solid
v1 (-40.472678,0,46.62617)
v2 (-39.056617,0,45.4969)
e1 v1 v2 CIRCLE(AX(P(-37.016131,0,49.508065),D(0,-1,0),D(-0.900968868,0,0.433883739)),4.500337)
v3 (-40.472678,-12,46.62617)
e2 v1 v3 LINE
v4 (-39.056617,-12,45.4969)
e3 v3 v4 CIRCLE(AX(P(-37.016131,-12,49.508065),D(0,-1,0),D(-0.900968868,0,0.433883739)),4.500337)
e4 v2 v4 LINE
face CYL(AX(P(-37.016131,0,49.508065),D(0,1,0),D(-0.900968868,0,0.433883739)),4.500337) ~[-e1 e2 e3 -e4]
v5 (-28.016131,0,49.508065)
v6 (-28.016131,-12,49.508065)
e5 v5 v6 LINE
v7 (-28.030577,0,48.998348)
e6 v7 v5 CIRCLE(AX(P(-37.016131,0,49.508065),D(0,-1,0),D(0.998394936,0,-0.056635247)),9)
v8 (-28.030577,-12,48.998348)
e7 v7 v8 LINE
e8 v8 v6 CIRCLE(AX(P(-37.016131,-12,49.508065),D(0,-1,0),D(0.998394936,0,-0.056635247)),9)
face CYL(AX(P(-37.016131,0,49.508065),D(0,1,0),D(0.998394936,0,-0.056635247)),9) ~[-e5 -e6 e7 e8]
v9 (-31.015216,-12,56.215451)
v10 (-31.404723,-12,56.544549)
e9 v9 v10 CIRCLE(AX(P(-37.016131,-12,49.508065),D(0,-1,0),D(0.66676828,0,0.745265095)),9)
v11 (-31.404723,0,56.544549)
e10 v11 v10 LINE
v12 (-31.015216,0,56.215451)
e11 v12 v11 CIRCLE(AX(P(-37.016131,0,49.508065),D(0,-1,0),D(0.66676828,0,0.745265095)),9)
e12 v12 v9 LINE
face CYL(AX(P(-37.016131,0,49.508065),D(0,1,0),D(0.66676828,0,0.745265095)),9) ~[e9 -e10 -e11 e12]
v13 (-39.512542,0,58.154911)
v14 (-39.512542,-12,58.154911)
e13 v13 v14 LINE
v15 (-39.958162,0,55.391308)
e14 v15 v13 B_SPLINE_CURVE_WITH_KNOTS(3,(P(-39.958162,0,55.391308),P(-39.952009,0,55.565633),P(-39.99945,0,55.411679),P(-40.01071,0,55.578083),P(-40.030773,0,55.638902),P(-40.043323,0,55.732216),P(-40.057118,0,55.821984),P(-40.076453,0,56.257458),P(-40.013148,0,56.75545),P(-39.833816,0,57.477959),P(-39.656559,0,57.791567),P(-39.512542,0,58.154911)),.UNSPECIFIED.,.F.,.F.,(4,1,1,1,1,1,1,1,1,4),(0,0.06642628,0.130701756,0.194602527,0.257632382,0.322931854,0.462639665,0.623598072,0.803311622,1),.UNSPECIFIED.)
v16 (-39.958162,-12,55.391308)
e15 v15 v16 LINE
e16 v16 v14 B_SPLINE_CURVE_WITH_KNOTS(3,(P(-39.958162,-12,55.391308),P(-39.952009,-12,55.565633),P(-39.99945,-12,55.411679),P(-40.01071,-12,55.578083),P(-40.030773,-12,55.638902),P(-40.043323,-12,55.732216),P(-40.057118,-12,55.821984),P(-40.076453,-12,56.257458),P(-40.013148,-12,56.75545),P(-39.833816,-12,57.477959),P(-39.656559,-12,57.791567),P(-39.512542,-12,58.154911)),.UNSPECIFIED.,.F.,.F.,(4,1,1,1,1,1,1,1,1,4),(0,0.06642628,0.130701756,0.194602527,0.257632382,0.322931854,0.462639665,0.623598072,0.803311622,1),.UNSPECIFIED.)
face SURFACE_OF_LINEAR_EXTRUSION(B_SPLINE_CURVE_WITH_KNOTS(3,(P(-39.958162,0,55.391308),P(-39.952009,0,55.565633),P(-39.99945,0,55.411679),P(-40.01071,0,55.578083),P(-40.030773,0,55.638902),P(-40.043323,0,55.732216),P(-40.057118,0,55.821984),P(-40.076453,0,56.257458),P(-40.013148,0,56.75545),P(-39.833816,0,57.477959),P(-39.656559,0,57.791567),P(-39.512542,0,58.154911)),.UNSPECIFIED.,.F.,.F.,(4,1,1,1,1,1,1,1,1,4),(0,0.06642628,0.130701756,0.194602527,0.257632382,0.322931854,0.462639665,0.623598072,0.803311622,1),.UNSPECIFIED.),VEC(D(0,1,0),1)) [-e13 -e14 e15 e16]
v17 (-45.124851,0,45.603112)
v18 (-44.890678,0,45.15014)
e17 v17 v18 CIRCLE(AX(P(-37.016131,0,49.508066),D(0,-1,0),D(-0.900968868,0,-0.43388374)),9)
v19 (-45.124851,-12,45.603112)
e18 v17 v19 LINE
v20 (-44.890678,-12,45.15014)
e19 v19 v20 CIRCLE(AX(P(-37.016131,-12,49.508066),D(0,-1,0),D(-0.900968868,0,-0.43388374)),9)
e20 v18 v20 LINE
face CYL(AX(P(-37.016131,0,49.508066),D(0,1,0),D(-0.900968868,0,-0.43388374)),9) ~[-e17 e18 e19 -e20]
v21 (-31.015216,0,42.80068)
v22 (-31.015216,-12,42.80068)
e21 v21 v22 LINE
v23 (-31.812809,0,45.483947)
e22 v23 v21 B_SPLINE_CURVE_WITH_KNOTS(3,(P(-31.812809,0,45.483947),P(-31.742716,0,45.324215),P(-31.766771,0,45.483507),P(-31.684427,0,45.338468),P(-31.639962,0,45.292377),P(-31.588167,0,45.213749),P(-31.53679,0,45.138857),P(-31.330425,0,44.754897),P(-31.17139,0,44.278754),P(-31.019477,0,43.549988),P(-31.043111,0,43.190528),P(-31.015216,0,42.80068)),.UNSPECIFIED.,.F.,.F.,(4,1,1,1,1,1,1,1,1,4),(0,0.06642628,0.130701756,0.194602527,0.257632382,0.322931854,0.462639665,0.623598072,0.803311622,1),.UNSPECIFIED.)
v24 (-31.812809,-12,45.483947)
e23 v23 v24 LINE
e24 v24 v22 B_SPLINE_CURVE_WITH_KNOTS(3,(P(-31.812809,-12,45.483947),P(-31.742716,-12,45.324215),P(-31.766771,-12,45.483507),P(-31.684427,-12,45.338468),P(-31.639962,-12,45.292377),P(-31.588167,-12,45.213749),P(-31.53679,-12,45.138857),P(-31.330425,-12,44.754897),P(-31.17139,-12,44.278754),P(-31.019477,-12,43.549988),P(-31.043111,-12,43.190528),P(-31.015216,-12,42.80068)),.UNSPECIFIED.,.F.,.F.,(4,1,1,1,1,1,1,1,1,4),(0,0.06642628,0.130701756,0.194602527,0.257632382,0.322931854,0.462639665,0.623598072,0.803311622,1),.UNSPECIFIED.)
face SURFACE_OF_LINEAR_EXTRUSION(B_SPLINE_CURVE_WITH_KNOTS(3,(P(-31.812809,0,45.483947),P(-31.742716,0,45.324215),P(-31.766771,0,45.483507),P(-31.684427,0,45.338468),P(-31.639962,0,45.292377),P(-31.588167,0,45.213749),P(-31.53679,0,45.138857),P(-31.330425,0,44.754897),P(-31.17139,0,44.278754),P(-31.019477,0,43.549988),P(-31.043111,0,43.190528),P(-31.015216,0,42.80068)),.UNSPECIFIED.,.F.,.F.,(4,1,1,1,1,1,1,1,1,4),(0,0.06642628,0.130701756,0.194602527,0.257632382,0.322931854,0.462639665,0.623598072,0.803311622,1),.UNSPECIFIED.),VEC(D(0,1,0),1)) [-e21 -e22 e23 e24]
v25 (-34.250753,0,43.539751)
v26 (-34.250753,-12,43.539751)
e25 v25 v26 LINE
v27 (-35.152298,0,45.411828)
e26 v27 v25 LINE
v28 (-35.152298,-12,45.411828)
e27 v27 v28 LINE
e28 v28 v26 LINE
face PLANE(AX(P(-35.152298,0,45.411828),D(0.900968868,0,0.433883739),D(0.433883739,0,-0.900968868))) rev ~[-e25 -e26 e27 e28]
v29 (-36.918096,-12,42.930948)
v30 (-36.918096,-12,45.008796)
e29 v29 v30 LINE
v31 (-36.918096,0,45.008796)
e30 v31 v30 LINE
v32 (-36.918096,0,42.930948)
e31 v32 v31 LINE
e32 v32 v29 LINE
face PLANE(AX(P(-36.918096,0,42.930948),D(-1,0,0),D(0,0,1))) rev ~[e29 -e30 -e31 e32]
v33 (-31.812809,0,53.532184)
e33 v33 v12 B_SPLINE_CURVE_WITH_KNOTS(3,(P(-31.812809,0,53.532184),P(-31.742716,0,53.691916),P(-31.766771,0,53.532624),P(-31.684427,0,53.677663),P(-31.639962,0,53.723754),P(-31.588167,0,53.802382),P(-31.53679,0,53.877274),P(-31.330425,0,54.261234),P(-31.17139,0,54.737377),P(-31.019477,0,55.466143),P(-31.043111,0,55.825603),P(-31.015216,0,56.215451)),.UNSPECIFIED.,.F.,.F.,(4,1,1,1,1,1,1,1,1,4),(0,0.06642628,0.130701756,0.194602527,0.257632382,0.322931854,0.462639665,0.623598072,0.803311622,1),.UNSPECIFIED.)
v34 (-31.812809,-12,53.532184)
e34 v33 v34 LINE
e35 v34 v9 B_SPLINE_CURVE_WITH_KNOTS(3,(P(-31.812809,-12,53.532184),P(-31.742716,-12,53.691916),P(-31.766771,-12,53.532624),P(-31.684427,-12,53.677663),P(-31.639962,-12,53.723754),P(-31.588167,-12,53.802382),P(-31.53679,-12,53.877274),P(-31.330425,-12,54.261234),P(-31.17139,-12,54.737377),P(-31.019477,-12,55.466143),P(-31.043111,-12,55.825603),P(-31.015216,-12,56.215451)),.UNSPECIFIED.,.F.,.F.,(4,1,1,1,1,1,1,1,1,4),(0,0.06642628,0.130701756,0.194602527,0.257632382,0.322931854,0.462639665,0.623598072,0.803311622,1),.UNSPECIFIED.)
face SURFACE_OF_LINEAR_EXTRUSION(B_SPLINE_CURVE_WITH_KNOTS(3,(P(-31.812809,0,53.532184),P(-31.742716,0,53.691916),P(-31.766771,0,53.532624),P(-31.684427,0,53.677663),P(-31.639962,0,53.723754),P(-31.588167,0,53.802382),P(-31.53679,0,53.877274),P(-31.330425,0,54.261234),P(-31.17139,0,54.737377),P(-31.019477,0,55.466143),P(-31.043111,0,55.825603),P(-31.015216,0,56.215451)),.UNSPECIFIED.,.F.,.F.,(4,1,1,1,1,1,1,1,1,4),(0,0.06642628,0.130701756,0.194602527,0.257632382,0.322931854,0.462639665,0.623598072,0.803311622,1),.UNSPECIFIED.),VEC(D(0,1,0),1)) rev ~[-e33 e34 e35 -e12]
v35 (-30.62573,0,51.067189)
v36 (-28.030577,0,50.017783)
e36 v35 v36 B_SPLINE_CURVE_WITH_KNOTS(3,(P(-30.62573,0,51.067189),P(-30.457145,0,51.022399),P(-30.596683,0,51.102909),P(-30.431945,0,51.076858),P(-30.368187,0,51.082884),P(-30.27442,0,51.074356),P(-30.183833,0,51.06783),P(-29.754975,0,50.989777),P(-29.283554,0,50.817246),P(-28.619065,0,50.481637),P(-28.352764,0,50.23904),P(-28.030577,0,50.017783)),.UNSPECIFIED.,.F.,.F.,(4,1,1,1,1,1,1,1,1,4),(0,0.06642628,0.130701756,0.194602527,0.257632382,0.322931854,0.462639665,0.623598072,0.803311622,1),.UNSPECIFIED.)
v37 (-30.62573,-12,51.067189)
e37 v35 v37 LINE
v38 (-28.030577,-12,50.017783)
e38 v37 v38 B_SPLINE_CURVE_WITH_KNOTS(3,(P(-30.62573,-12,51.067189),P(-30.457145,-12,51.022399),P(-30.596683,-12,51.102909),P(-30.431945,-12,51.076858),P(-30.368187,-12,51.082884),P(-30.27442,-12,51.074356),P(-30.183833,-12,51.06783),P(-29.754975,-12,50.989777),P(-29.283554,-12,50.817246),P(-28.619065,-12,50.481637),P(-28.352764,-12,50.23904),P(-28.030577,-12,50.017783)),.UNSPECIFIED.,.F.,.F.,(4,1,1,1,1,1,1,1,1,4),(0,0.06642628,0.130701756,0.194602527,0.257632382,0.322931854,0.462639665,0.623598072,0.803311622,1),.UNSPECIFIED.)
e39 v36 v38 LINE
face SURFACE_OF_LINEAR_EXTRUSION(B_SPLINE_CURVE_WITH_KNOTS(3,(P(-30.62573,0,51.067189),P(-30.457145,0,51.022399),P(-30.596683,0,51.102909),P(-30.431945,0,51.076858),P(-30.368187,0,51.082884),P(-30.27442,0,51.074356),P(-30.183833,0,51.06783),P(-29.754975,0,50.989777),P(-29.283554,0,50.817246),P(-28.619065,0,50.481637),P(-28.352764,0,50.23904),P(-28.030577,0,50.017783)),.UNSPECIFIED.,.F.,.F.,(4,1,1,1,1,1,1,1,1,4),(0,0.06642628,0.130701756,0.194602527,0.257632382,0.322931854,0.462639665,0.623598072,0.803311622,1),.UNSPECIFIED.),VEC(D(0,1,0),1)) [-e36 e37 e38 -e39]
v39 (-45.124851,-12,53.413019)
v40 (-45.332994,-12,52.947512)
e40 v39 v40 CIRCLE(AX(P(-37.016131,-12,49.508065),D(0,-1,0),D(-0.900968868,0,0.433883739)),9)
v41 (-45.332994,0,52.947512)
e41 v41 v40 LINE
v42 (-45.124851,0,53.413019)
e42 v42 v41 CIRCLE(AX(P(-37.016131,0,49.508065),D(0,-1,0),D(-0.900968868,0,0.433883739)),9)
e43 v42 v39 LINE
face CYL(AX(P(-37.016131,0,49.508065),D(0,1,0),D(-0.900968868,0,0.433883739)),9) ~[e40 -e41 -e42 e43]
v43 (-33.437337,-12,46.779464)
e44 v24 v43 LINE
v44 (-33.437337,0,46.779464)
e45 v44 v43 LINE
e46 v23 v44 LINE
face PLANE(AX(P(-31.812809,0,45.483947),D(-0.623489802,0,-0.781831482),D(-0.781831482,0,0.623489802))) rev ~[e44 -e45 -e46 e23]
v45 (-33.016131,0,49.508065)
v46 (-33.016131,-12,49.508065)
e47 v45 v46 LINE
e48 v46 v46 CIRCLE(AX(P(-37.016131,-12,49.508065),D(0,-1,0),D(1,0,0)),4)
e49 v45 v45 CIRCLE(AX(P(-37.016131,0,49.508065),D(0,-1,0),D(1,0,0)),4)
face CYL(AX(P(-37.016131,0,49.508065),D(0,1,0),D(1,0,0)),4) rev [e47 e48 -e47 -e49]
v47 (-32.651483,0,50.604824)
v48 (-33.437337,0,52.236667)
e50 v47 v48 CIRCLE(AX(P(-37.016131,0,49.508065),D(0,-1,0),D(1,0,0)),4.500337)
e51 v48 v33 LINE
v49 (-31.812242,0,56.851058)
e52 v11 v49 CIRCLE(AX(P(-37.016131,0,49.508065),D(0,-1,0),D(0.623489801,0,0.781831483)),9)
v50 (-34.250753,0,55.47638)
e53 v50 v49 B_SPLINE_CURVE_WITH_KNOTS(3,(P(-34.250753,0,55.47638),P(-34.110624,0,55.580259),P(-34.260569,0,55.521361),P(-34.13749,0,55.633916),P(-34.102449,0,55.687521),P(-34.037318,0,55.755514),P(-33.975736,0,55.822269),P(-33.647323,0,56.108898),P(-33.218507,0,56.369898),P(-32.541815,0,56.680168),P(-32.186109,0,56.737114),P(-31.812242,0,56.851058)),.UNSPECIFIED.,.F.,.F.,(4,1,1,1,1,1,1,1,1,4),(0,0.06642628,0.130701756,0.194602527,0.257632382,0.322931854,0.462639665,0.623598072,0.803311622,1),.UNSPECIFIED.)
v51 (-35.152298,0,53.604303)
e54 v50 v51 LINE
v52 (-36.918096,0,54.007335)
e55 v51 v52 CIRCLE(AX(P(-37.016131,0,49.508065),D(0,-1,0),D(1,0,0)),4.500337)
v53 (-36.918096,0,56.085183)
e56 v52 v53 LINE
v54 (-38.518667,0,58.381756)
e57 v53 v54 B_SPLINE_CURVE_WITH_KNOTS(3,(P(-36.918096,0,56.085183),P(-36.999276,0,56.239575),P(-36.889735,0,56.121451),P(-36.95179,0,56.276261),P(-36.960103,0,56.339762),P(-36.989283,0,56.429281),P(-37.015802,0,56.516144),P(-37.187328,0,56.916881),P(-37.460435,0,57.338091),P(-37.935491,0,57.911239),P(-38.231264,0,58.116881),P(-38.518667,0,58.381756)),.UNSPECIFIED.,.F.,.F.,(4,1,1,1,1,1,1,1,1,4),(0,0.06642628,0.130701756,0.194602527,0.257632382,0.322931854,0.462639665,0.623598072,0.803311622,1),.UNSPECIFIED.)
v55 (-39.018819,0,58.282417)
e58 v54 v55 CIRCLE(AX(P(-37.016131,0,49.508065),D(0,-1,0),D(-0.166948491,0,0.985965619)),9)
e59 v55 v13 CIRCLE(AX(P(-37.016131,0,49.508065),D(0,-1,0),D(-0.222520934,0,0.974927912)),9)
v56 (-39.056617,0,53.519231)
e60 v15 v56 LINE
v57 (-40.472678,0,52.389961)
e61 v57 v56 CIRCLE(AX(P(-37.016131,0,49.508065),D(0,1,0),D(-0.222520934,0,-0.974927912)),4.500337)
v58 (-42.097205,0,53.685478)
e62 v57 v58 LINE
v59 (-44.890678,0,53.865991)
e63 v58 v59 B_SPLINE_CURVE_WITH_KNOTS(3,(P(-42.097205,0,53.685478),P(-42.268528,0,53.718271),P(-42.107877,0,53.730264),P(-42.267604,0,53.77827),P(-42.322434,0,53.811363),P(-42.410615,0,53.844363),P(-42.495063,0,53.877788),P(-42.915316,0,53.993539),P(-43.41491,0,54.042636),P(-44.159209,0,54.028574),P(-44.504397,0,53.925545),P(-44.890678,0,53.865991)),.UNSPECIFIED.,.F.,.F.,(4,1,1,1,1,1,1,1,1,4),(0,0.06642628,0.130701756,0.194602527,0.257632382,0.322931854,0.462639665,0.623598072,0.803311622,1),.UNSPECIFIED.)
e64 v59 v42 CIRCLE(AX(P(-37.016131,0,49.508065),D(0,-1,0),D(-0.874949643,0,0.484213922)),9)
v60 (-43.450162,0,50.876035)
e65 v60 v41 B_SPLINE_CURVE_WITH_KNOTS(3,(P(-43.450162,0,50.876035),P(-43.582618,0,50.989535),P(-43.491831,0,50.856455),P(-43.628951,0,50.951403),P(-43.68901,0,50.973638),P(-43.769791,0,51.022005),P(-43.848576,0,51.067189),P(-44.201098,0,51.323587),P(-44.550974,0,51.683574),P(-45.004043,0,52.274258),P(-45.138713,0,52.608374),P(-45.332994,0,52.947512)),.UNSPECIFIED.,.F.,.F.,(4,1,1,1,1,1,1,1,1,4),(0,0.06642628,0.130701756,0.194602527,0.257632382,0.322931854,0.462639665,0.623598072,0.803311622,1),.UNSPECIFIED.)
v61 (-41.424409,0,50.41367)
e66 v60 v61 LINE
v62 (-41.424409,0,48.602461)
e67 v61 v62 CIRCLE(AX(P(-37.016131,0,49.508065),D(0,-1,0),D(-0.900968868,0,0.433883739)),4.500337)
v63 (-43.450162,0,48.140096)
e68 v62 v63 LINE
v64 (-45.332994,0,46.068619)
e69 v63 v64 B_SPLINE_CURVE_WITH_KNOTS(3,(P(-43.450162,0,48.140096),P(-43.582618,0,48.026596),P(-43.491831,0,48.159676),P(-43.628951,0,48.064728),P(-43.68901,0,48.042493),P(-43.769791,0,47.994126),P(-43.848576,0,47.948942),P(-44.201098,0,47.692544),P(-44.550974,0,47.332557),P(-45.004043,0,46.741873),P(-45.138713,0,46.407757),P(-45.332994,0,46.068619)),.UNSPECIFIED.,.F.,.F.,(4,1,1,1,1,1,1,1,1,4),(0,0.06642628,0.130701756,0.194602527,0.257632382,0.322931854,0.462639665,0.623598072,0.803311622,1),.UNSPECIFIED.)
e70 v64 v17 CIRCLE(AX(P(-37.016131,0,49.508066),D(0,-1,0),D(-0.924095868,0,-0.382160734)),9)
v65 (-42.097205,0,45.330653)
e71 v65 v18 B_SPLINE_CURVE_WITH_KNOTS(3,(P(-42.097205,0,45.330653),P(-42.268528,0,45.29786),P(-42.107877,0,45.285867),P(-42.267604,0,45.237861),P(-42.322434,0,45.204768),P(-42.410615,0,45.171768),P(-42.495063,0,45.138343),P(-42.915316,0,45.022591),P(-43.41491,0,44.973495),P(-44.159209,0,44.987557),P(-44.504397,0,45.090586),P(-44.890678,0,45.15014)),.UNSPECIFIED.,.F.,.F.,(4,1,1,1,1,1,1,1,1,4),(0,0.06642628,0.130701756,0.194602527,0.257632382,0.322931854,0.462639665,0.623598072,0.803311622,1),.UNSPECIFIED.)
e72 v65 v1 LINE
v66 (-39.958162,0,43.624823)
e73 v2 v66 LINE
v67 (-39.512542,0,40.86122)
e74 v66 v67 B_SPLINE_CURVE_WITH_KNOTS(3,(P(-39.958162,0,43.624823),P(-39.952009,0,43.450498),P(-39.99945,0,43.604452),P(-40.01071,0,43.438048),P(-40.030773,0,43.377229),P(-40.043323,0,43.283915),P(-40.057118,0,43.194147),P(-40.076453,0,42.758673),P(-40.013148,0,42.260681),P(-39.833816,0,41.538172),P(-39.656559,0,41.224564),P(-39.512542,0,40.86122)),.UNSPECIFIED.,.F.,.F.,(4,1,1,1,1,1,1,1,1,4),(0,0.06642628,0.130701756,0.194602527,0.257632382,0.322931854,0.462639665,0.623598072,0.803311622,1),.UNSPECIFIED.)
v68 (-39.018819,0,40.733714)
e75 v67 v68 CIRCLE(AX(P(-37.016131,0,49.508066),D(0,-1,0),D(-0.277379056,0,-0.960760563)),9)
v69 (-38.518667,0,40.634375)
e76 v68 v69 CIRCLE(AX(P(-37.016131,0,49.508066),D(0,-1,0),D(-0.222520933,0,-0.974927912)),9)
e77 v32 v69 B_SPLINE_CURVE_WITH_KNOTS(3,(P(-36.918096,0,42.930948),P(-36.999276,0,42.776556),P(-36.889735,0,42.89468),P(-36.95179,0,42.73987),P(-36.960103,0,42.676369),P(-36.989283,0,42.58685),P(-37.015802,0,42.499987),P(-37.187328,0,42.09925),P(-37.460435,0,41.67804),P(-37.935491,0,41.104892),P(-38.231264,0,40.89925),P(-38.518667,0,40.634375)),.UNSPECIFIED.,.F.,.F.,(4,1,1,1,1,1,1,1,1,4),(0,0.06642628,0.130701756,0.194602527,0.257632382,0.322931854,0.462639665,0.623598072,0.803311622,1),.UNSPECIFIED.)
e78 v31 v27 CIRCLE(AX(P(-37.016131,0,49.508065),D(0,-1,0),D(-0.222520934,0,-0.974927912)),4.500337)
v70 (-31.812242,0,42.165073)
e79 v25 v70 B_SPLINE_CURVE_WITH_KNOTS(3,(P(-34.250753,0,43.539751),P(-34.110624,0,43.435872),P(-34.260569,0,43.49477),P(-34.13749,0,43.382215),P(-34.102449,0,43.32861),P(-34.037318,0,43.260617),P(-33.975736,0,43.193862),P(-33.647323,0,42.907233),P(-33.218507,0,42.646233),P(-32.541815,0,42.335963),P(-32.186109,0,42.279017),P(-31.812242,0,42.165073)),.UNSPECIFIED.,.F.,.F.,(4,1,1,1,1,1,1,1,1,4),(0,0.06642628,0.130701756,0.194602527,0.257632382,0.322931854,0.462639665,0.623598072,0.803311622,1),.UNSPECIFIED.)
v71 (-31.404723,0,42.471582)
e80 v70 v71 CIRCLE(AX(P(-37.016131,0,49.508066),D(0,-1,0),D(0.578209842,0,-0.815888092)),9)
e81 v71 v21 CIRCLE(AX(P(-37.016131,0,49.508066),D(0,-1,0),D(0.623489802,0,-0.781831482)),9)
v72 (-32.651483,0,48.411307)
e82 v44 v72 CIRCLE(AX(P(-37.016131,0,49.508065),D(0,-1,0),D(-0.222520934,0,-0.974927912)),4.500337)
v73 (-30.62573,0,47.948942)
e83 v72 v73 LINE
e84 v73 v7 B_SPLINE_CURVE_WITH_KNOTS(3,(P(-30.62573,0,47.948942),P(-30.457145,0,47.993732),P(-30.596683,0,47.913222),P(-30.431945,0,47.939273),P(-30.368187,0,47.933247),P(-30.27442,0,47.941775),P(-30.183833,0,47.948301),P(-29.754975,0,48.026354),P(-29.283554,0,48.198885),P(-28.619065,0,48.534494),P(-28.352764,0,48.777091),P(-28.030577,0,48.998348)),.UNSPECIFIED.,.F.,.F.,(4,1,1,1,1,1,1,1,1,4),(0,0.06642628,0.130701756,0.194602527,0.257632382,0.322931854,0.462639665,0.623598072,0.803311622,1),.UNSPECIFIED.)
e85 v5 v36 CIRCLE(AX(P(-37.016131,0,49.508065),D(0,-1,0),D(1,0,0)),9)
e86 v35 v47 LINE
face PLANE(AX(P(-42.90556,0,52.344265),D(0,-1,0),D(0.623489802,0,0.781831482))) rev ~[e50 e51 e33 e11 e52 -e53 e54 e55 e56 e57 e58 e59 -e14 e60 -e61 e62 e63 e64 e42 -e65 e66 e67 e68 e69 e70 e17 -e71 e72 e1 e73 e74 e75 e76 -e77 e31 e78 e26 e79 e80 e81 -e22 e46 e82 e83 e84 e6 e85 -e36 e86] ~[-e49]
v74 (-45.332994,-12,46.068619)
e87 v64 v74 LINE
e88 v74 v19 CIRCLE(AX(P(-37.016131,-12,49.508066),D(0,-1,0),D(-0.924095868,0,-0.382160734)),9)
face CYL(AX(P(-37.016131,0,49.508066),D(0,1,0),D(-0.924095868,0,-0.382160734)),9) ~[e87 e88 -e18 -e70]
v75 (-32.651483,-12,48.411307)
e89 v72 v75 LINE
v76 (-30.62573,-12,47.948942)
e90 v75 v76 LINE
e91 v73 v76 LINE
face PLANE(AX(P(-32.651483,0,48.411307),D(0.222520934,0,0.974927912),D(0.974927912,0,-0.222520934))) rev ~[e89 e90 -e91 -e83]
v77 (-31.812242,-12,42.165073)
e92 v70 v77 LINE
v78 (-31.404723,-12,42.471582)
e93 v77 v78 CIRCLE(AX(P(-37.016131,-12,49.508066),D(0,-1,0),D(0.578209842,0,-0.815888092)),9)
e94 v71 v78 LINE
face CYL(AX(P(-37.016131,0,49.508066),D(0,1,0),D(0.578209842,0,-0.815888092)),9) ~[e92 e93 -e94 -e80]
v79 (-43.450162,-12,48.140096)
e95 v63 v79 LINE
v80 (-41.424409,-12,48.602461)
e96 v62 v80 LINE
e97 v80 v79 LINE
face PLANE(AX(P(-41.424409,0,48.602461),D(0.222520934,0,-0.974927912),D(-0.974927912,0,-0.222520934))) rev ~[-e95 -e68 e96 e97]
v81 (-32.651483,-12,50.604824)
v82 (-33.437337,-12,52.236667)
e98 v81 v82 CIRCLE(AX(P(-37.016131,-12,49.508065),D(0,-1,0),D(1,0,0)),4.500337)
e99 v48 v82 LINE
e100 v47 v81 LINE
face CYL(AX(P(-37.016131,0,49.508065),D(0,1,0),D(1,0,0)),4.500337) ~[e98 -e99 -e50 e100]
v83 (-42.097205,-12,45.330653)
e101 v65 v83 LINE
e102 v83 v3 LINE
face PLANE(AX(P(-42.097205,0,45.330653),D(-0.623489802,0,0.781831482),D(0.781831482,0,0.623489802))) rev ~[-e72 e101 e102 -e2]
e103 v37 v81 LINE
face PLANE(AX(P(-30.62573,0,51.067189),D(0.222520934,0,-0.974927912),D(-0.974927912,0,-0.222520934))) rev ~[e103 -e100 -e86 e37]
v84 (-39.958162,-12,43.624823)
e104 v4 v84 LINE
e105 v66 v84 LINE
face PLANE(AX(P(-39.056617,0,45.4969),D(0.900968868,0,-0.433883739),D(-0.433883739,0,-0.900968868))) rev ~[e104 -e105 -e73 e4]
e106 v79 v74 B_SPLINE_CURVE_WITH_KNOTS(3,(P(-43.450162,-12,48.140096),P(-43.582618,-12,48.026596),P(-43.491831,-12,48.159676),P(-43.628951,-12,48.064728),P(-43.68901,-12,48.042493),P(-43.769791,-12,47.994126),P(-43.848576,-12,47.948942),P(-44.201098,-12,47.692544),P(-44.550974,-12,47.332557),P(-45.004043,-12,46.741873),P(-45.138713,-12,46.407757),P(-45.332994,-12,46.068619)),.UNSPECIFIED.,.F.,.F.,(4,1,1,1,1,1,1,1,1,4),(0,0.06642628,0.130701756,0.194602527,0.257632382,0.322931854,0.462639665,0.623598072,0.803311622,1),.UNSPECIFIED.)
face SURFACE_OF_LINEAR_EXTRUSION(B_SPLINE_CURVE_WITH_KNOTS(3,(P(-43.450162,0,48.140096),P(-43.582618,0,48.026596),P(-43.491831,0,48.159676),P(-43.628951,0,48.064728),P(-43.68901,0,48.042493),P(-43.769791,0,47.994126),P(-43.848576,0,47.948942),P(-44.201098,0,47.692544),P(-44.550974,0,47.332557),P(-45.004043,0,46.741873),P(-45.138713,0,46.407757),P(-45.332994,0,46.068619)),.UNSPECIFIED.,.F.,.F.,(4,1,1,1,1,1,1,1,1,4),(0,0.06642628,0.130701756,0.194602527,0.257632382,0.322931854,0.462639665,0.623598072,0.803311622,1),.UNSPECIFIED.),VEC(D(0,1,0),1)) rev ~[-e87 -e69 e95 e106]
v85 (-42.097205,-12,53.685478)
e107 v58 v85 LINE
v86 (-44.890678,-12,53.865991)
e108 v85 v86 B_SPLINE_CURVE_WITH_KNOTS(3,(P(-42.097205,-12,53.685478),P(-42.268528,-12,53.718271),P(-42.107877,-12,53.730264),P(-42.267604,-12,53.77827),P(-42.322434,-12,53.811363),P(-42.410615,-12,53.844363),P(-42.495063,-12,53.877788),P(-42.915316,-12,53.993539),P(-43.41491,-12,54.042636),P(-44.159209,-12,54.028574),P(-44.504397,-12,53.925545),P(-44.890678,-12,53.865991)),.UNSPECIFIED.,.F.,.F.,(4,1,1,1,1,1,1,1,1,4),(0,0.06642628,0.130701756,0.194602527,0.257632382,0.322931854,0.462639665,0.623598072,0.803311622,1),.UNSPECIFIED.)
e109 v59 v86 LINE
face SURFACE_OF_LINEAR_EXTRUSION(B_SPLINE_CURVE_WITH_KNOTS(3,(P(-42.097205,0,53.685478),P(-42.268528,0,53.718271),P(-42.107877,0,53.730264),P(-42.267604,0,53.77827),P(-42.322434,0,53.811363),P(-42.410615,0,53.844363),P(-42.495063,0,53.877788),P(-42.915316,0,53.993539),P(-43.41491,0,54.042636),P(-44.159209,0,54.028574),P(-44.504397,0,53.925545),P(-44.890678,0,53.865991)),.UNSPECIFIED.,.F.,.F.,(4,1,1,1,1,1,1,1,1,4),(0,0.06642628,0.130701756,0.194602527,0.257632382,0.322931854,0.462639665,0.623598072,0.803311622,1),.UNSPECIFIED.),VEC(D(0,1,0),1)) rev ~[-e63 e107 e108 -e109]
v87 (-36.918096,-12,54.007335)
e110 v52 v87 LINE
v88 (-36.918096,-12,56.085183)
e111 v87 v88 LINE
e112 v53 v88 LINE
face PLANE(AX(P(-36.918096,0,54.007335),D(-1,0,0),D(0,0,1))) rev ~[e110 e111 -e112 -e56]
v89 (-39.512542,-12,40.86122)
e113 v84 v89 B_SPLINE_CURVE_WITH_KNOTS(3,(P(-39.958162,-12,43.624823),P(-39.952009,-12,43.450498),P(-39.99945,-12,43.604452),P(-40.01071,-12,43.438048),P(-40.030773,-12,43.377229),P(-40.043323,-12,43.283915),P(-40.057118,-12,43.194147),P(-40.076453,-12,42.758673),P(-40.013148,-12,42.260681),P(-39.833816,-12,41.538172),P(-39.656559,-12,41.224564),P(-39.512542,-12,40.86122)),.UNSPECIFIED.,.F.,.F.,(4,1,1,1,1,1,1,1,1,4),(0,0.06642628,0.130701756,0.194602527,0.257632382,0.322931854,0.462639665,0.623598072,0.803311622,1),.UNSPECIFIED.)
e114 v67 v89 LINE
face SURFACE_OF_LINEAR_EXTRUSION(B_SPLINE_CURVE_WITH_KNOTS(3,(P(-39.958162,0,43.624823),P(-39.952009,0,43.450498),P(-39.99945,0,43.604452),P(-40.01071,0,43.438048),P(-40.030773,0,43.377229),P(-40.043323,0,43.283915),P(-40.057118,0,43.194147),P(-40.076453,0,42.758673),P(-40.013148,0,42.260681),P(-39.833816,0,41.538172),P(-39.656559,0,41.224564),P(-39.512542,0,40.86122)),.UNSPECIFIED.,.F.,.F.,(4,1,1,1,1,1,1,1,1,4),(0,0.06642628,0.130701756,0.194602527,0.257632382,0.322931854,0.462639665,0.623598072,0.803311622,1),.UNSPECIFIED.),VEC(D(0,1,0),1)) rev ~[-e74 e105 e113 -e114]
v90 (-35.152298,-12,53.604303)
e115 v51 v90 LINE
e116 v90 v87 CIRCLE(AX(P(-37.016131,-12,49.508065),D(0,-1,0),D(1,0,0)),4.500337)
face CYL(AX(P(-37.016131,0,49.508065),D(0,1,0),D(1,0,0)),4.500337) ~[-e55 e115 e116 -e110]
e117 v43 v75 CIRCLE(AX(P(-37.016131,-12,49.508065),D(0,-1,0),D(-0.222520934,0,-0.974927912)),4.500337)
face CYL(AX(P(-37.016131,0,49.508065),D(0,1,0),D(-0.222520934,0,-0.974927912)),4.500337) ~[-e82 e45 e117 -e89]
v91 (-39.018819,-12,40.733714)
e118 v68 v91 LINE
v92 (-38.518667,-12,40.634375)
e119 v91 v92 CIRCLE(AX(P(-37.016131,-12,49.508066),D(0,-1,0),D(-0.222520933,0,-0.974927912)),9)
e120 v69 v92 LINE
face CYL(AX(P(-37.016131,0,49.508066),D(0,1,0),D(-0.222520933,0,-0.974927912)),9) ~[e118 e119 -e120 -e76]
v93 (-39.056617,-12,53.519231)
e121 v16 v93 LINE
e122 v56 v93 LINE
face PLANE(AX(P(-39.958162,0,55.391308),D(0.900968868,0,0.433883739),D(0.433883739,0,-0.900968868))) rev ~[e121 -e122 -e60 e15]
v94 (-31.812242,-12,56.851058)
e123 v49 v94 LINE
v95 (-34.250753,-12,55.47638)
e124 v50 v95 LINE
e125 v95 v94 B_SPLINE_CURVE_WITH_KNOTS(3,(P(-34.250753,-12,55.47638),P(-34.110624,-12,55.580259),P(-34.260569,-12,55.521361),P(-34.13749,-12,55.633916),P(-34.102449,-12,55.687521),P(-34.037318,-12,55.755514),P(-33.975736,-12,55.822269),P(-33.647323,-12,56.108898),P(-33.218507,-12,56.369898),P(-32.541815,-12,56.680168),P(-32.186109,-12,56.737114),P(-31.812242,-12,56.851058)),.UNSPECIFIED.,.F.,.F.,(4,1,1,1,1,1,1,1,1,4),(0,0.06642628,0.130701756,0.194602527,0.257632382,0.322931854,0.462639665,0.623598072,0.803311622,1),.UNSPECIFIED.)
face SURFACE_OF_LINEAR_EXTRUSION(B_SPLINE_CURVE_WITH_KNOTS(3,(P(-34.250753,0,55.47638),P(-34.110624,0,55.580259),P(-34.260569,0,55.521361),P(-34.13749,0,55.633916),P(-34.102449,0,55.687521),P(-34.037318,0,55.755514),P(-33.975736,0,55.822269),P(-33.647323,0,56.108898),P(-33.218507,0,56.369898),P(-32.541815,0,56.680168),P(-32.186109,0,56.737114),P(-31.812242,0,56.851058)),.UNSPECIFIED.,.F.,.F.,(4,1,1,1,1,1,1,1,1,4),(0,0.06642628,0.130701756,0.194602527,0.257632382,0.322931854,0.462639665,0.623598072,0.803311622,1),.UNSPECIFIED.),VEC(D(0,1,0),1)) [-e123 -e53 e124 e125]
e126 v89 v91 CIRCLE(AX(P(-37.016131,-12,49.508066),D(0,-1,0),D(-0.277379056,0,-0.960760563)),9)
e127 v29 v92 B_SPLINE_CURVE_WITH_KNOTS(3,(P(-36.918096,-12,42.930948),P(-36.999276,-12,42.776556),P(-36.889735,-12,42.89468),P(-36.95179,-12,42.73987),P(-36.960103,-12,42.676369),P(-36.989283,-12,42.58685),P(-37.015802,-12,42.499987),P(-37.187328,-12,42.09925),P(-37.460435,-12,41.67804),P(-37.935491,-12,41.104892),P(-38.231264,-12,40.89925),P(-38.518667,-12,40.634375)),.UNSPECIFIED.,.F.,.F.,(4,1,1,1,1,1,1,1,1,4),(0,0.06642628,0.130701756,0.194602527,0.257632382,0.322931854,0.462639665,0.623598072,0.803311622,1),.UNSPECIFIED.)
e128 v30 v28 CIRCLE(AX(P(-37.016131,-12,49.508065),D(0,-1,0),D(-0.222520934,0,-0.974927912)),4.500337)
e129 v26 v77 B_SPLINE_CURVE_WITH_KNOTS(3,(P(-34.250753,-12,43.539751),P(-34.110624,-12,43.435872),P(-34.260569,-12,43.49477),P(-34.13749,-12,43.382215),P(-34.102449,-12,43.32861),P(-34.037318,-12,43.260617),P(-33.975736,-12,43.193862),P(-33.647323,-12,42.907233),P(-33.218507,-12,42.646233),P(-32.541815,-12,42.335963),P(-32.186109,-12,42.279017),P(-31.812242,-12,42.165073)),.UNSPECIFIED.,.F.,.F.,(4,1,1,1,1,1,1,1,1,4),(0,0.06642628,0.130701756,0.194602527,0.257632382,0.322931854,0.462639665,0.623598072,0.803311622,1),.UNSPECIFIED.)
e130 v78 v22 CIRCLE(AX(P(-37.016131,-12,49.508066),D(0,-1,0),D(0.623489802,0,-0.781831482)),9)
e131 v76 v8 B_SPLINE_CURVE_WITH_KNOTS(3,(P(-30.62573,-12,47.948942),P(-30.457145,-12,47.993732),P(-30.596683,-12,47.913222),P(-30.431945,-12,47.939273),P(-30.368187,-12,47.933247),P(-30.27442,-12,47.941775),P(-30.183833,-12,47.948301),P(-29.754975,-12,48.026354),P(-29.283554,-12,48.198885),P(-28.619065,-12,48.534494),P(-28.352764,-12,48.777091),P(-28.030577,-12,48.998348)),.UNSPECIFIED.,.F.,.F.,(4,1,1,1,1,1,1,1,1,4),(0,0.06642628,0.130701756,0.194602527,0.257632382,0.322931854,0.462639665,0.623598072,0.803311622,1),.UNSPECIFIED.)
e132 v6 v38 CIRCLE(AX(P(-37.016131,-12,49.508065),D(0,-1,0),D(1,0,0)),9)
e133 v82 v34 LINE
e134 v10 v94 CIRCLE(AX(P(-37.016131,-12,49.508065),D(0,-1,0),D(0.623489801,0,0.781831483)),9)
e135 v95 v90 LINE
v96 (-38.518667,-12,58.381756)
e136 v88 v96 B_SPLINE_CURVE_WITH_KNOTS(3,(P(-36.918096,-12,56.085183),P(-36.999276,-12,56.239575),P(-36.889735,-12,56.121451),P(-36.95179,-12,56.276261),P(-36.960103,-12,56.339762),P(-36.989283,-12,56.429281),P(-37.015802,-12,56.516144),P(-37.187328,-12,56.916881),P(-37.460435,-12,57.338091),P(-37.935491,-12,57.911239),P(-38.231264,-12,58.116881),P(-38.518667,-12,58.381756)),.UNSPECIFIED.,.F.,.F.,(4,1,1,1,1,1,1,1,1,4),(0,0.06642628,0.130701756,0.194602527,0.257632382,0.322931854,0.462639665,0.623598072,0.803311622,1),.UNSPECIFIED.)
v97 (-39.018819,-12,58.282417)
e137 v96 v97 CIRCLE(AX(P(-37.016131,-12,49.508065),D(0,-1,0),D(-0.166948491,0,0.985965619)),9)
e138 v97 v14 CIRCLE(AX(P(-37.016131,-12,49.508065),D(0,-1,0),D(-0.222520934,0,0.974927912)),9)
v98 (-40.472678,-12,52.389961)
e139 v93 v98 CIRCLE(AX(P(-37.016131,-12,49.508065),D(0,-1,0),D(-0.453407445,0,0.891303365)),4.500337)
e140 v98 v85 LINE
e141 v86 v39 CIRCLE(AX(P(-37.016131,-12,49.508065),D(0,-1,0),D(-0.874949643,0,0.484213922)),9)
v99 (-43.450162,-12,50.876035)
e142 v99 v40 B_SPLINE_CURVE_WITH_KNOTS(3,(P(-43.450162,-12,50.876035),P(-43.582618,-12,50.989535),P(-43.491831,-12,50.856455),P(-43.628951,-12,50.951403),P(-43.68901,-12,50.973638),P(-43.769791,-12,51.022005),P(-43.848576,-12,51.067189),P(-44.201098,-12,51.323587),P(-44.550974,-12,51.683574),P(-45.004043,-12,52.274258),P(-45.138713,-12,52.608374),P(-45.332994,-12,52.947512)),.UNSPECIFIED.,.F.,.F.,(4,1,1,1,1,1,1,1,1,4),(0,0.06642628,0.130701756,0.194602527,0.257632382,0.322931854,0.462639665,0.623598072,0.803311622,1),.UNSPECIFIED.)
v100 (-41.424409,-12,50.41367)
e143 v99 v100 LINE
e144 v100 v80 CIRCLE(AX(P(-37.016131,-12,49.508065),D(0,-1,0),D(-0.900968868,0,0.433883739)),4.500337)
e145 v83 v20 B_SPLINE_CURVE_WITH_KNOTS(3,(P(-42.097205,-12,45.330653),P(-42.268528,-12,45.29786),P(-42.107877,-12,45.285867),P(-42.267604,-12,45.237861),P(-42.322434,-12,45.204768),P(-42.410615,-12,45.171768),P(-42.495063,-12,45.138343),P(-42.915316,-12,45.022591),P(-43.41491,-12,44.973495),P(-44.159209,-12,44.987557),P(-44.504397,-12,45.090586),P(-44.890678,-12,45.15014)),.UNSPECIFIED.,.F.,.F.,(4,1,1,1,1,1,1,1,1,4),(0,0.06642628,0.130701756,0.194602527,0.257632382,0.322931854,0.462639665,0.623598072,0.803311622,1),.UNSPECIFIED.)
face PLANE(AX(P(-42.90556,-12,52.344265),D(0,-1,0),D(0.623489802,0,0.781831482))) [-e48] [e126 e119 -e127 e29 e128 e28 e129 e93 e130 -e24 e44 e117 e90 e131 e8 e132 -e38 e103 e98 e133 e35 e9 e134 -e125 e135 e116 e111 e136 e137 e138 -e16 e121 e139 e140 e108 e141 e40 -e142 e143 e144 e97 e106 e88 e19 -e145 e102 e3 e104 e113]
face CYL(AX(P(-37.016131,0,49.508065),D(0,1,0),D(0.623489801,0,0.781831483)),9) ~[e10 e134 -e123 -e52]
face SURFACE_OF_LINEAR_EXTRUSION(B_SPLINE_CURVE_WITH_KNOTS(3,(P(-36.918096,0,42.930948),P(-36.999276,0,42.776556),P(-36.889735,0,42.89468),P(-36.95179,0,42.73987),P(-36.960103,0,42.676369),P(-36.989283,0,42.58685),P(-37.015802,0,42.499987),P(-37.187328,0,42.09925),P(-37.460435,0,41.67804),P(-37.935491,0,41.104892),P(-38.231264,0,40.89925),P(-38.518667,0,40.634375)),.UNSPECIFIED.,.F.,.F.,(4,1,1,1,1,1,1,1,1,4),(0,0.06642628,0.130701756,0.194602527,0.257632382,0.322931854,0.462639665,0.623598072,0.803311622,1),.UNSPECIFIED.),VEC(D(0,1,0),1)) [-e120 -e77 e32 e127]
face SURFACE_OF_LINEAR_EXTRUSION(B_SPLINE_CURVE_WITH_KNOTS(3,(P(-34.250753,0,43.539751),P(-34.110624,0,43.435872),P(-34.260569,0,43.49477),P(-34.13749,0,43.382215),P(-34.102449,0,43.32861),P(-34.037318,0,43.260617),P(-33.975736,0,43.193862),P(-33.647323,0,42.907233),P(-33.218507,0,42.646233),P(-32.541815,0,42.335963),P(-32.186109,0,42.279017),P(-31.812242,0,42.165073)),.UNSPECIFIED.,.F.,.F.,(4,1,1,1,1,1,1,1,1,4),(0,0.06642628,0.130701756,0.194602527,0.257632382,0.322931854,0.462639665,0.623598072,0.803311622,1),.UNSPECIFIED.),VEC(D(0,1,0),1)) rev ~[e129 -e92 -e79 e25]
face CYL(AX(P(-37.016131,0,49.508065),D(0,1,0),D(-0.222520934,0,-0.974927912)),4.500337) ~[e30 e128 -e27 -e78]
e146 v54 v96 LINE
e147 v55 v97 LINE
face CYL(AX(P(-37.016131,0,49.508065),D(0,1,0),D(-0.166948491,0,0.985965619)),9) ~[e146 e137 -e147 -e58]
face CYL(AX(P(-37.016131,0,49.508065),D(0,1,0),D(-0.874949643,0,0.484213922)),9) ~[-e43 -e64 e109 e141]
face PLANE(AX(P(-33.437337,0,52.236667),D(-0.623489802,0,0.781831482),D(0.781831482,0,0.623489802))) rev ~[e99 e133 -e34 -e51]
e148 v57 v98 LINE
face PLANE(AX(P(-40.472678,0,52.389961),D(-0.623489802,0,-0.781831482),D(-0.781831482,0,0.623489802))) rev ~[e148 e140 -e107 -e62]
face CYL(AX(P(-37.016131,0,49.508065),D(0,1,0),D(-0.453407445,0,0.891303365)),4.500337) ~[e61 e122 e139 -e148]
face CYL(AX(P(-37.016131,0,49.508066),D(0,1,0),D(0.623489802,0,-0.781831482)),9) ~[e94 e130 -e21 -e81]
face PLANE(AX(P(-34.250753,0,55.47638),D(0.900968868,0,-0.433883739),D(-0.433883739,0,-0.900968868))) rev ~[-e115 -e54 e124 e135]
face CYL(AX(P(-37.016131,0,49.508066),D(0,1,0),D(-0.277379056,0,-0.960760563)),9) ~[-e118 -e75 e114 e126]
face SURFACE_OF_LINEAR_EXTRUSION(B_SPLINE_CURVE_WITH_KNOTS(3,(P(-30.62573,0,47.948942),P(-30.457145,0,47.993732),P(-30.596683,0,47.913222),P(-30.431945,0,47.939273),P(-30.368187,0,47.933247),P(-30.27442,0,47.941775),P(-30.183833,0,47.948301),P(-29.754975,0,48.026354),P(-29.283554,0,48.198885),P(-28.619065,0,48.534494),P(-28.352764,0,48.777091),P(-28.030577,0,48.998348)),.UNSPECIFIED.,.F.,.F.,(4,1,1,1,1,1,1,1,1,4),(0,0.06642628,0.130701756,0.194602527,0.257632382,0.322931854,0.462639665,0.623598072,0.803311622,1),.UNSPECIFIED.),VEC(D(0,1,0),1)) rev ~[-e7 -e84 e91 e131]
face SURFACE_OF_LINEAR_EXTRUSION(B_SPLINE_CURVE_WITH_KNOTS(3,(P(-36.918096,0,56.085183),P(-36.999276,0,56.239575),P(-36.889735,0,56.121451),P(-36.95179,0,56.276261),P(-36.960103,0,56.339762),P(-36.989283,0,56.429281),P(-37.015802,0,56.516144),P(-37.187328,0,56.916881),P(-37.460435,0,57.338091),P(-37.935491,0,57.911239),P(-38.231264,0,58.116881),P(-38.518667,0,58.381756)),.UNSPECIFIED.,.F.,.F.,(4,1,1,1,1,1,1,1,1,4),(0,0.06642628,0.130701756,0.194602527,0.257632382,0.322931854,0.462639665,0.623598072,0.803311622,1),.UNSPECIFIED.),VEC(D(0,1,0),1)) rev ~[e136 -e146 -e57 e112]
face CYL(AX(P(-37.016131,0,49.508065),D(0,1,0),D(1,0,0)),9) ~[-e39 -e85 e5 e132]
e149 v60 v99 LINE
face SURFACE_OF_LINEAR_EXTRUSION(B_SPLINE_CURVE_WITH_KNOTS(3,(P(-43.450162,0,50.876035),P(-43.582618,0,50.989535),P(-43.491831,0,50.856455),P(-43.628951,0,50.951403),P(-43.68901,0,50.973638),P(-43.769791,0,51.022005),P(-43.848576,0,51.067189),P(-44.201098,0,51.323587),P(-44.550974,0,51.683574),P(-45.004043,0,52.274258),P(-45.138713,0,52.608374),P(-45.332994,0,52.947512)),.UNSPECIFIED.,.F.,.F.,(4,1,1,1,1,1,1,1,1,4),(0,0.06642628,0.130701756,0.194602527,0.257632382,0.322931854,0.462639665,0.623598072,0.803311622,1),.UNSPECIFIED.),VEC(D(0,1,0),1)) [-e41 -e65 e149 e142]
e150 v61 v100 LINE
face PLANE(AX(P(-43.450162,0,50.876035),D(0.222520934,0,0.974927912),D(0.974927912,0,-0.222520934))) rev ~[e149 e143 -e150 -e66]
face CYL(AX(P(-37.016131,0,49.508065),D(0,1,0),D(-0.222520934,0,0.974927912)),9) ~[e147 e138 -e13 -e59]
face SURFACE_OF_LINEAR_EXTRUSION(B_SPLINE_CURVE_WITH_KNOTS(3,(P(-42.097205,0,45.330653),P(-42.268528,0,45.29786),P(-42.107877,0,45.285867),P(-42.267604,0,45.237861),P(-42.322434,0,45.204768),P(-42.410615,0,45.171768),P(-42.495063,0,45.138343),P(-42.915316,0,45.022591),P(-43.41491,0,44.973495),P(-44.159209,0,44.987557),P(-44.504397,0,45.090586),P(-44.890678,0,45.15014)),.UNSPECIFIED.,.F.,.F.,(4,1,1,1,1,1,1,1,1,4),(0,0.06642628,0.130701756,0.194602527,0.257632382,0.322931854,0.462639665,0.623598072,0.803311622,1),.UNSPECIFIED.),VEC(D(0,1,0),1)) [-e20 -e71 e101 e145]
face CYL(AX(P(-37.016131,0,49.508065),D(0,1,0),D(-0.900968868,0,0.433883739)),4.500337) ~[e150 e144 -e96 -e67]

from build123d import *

# Parameters (mm, degrees)
F7_DEPTH  = 12
F8_DEPTH  = 12
F12_COUNT = 7
F13_R     = 4
F14_DEPTH = 12


with BuildPart() as f7:
    # F6 (on Front) → F7 (new body)
    with BuildSketch(Plane.XZ):
        with BuildLine():
            ThreePointArc((-39.0566174341, 53.5192313022), (-39.3688059254, 45.6716665645), (-32.5157936507, 49.5080654919))
            ThreePointArc((-32.5157936507, 49.5080654919), (-33.7994380125, 52.6554330331), (-36.9180958368, 54.0073349017))
            ThreePointArc((-36.9180958368, 54.0073349017), (-37.4712667511, 53.985328891), (-38.0175502503, 53.8955699722))
            ThreePointArc((-38.0175502503, 53.8955699722), (-38.5486796114, 53.7394164364), (-39.0566174341, 53.5192313022))
        make_face()
    extrude(amount=F7_DEPTH)

    # F5 (on Front) → F8 (join)
    with BuildSketch(Plane.XZ):
        with BuildLine():
            Line((-36.9180958368, 54.0073349017), (-36.9180958368, 56.0851832472))
            add(Edge.make_bspline(
                [(-36.9180958368, 56.0851832472), (-36.9992763265, 56.2395751396), (-36.8897351126, 56.1214509955), (-36.9517903268, 56.2762613124), (-36.9601028005, 56.3397622343), (-36.9892825172, 56.4292805319), (-37.0158024339, 56.5161441761), (-37.1873279574, 56.9168814222), (-37.4604346943, 57.3380905686), (-37.9354913593, 57.9112391709), (-38.231263722, 58.1168811972), (-38.5186673986, 58.3817560614)],
                knots=[0, 0, 0, 0, 0.06642628, 0.1307017559, 0.1946025272, 0.2576323816, 0.3229318542, 0.4626396647, 0.6235980721, 0.8033116217, 1, 1, 1, 1], degree=3))
            ThreePointArc((-38.5186673986, 58.3817560614), (-38.7694470812, 58.335629293), (-39.0188193894, 58.2824167016))
            ThreePointArc((-39.0188193894, 58.2824167016), (-39.2665841538, 58.2221610003), (-39.5125424953, 58.1549105562))
            add(Edge.make_bspline(
                [(-39.9581620436, 55.3913079737), (-39.9520090813, 55.5656331567), (-39.9994501593, 55.4116788289), (-40.0107100225, 55.5780828532), (-40.0307727598, 55.6389018541), (-40.0433232772, 55.7322156579), (-40.0571183806, 55.8219836577), (-40.0764525986, 56.2574575761), (-40.0131477305, 56.7554504761), (-39.8338163235, 57.4779588856), (-39.656559364, 57.7915667679), (-39.5125424953, 58.1549105562)],
                knots=[0, 0, 0, 0, 0.06642628, 0.1307017559, 0.1946025272, 0.2576323816, 0.3229318542, 0.4626396647, 0.6235980721, 0.8033116217, 1, 1, 1, 1], degree=3))
            Line((-39.9581620436, 55.3913079737), (-39.0566174341, 53.5192313022))
            ThreePointArc((-39.0566174341, 53.5192313022), (-38.5486796114, 53.7394164364), (-38.0175502503, 53.8955699722))
            ThreePointArc((-38.0175502503, 53.8955699722), (-37.4712667511, 53.985328891), (-36.9180958368, 54.0073349017))
        make_face()
    extrude(amount=F8_DEPTH)

    # F12: F7 ×7 about axis
    f12_axis = Axis((-37.0161309838, 15.3900273144, 49.5080654919), (0, 1, 0))


with BuildPart() as f7_1:
    add(f7.part)
    for i in range(1, F12_COUNT):
        add(f7.part.rotate(f12_axis, i * 360 / F12_COUNT))

    # F13 (on Front) → F14 (cut)
    with BuildSketch(Plane.XZ):
        with Locations((-37.0161309838, 49.5080654919)):
            Circle(F13_R)
    extrude(amount=F14_DEPTH, mode=Mode.SUBTRACT)


solid = f7_1.part
